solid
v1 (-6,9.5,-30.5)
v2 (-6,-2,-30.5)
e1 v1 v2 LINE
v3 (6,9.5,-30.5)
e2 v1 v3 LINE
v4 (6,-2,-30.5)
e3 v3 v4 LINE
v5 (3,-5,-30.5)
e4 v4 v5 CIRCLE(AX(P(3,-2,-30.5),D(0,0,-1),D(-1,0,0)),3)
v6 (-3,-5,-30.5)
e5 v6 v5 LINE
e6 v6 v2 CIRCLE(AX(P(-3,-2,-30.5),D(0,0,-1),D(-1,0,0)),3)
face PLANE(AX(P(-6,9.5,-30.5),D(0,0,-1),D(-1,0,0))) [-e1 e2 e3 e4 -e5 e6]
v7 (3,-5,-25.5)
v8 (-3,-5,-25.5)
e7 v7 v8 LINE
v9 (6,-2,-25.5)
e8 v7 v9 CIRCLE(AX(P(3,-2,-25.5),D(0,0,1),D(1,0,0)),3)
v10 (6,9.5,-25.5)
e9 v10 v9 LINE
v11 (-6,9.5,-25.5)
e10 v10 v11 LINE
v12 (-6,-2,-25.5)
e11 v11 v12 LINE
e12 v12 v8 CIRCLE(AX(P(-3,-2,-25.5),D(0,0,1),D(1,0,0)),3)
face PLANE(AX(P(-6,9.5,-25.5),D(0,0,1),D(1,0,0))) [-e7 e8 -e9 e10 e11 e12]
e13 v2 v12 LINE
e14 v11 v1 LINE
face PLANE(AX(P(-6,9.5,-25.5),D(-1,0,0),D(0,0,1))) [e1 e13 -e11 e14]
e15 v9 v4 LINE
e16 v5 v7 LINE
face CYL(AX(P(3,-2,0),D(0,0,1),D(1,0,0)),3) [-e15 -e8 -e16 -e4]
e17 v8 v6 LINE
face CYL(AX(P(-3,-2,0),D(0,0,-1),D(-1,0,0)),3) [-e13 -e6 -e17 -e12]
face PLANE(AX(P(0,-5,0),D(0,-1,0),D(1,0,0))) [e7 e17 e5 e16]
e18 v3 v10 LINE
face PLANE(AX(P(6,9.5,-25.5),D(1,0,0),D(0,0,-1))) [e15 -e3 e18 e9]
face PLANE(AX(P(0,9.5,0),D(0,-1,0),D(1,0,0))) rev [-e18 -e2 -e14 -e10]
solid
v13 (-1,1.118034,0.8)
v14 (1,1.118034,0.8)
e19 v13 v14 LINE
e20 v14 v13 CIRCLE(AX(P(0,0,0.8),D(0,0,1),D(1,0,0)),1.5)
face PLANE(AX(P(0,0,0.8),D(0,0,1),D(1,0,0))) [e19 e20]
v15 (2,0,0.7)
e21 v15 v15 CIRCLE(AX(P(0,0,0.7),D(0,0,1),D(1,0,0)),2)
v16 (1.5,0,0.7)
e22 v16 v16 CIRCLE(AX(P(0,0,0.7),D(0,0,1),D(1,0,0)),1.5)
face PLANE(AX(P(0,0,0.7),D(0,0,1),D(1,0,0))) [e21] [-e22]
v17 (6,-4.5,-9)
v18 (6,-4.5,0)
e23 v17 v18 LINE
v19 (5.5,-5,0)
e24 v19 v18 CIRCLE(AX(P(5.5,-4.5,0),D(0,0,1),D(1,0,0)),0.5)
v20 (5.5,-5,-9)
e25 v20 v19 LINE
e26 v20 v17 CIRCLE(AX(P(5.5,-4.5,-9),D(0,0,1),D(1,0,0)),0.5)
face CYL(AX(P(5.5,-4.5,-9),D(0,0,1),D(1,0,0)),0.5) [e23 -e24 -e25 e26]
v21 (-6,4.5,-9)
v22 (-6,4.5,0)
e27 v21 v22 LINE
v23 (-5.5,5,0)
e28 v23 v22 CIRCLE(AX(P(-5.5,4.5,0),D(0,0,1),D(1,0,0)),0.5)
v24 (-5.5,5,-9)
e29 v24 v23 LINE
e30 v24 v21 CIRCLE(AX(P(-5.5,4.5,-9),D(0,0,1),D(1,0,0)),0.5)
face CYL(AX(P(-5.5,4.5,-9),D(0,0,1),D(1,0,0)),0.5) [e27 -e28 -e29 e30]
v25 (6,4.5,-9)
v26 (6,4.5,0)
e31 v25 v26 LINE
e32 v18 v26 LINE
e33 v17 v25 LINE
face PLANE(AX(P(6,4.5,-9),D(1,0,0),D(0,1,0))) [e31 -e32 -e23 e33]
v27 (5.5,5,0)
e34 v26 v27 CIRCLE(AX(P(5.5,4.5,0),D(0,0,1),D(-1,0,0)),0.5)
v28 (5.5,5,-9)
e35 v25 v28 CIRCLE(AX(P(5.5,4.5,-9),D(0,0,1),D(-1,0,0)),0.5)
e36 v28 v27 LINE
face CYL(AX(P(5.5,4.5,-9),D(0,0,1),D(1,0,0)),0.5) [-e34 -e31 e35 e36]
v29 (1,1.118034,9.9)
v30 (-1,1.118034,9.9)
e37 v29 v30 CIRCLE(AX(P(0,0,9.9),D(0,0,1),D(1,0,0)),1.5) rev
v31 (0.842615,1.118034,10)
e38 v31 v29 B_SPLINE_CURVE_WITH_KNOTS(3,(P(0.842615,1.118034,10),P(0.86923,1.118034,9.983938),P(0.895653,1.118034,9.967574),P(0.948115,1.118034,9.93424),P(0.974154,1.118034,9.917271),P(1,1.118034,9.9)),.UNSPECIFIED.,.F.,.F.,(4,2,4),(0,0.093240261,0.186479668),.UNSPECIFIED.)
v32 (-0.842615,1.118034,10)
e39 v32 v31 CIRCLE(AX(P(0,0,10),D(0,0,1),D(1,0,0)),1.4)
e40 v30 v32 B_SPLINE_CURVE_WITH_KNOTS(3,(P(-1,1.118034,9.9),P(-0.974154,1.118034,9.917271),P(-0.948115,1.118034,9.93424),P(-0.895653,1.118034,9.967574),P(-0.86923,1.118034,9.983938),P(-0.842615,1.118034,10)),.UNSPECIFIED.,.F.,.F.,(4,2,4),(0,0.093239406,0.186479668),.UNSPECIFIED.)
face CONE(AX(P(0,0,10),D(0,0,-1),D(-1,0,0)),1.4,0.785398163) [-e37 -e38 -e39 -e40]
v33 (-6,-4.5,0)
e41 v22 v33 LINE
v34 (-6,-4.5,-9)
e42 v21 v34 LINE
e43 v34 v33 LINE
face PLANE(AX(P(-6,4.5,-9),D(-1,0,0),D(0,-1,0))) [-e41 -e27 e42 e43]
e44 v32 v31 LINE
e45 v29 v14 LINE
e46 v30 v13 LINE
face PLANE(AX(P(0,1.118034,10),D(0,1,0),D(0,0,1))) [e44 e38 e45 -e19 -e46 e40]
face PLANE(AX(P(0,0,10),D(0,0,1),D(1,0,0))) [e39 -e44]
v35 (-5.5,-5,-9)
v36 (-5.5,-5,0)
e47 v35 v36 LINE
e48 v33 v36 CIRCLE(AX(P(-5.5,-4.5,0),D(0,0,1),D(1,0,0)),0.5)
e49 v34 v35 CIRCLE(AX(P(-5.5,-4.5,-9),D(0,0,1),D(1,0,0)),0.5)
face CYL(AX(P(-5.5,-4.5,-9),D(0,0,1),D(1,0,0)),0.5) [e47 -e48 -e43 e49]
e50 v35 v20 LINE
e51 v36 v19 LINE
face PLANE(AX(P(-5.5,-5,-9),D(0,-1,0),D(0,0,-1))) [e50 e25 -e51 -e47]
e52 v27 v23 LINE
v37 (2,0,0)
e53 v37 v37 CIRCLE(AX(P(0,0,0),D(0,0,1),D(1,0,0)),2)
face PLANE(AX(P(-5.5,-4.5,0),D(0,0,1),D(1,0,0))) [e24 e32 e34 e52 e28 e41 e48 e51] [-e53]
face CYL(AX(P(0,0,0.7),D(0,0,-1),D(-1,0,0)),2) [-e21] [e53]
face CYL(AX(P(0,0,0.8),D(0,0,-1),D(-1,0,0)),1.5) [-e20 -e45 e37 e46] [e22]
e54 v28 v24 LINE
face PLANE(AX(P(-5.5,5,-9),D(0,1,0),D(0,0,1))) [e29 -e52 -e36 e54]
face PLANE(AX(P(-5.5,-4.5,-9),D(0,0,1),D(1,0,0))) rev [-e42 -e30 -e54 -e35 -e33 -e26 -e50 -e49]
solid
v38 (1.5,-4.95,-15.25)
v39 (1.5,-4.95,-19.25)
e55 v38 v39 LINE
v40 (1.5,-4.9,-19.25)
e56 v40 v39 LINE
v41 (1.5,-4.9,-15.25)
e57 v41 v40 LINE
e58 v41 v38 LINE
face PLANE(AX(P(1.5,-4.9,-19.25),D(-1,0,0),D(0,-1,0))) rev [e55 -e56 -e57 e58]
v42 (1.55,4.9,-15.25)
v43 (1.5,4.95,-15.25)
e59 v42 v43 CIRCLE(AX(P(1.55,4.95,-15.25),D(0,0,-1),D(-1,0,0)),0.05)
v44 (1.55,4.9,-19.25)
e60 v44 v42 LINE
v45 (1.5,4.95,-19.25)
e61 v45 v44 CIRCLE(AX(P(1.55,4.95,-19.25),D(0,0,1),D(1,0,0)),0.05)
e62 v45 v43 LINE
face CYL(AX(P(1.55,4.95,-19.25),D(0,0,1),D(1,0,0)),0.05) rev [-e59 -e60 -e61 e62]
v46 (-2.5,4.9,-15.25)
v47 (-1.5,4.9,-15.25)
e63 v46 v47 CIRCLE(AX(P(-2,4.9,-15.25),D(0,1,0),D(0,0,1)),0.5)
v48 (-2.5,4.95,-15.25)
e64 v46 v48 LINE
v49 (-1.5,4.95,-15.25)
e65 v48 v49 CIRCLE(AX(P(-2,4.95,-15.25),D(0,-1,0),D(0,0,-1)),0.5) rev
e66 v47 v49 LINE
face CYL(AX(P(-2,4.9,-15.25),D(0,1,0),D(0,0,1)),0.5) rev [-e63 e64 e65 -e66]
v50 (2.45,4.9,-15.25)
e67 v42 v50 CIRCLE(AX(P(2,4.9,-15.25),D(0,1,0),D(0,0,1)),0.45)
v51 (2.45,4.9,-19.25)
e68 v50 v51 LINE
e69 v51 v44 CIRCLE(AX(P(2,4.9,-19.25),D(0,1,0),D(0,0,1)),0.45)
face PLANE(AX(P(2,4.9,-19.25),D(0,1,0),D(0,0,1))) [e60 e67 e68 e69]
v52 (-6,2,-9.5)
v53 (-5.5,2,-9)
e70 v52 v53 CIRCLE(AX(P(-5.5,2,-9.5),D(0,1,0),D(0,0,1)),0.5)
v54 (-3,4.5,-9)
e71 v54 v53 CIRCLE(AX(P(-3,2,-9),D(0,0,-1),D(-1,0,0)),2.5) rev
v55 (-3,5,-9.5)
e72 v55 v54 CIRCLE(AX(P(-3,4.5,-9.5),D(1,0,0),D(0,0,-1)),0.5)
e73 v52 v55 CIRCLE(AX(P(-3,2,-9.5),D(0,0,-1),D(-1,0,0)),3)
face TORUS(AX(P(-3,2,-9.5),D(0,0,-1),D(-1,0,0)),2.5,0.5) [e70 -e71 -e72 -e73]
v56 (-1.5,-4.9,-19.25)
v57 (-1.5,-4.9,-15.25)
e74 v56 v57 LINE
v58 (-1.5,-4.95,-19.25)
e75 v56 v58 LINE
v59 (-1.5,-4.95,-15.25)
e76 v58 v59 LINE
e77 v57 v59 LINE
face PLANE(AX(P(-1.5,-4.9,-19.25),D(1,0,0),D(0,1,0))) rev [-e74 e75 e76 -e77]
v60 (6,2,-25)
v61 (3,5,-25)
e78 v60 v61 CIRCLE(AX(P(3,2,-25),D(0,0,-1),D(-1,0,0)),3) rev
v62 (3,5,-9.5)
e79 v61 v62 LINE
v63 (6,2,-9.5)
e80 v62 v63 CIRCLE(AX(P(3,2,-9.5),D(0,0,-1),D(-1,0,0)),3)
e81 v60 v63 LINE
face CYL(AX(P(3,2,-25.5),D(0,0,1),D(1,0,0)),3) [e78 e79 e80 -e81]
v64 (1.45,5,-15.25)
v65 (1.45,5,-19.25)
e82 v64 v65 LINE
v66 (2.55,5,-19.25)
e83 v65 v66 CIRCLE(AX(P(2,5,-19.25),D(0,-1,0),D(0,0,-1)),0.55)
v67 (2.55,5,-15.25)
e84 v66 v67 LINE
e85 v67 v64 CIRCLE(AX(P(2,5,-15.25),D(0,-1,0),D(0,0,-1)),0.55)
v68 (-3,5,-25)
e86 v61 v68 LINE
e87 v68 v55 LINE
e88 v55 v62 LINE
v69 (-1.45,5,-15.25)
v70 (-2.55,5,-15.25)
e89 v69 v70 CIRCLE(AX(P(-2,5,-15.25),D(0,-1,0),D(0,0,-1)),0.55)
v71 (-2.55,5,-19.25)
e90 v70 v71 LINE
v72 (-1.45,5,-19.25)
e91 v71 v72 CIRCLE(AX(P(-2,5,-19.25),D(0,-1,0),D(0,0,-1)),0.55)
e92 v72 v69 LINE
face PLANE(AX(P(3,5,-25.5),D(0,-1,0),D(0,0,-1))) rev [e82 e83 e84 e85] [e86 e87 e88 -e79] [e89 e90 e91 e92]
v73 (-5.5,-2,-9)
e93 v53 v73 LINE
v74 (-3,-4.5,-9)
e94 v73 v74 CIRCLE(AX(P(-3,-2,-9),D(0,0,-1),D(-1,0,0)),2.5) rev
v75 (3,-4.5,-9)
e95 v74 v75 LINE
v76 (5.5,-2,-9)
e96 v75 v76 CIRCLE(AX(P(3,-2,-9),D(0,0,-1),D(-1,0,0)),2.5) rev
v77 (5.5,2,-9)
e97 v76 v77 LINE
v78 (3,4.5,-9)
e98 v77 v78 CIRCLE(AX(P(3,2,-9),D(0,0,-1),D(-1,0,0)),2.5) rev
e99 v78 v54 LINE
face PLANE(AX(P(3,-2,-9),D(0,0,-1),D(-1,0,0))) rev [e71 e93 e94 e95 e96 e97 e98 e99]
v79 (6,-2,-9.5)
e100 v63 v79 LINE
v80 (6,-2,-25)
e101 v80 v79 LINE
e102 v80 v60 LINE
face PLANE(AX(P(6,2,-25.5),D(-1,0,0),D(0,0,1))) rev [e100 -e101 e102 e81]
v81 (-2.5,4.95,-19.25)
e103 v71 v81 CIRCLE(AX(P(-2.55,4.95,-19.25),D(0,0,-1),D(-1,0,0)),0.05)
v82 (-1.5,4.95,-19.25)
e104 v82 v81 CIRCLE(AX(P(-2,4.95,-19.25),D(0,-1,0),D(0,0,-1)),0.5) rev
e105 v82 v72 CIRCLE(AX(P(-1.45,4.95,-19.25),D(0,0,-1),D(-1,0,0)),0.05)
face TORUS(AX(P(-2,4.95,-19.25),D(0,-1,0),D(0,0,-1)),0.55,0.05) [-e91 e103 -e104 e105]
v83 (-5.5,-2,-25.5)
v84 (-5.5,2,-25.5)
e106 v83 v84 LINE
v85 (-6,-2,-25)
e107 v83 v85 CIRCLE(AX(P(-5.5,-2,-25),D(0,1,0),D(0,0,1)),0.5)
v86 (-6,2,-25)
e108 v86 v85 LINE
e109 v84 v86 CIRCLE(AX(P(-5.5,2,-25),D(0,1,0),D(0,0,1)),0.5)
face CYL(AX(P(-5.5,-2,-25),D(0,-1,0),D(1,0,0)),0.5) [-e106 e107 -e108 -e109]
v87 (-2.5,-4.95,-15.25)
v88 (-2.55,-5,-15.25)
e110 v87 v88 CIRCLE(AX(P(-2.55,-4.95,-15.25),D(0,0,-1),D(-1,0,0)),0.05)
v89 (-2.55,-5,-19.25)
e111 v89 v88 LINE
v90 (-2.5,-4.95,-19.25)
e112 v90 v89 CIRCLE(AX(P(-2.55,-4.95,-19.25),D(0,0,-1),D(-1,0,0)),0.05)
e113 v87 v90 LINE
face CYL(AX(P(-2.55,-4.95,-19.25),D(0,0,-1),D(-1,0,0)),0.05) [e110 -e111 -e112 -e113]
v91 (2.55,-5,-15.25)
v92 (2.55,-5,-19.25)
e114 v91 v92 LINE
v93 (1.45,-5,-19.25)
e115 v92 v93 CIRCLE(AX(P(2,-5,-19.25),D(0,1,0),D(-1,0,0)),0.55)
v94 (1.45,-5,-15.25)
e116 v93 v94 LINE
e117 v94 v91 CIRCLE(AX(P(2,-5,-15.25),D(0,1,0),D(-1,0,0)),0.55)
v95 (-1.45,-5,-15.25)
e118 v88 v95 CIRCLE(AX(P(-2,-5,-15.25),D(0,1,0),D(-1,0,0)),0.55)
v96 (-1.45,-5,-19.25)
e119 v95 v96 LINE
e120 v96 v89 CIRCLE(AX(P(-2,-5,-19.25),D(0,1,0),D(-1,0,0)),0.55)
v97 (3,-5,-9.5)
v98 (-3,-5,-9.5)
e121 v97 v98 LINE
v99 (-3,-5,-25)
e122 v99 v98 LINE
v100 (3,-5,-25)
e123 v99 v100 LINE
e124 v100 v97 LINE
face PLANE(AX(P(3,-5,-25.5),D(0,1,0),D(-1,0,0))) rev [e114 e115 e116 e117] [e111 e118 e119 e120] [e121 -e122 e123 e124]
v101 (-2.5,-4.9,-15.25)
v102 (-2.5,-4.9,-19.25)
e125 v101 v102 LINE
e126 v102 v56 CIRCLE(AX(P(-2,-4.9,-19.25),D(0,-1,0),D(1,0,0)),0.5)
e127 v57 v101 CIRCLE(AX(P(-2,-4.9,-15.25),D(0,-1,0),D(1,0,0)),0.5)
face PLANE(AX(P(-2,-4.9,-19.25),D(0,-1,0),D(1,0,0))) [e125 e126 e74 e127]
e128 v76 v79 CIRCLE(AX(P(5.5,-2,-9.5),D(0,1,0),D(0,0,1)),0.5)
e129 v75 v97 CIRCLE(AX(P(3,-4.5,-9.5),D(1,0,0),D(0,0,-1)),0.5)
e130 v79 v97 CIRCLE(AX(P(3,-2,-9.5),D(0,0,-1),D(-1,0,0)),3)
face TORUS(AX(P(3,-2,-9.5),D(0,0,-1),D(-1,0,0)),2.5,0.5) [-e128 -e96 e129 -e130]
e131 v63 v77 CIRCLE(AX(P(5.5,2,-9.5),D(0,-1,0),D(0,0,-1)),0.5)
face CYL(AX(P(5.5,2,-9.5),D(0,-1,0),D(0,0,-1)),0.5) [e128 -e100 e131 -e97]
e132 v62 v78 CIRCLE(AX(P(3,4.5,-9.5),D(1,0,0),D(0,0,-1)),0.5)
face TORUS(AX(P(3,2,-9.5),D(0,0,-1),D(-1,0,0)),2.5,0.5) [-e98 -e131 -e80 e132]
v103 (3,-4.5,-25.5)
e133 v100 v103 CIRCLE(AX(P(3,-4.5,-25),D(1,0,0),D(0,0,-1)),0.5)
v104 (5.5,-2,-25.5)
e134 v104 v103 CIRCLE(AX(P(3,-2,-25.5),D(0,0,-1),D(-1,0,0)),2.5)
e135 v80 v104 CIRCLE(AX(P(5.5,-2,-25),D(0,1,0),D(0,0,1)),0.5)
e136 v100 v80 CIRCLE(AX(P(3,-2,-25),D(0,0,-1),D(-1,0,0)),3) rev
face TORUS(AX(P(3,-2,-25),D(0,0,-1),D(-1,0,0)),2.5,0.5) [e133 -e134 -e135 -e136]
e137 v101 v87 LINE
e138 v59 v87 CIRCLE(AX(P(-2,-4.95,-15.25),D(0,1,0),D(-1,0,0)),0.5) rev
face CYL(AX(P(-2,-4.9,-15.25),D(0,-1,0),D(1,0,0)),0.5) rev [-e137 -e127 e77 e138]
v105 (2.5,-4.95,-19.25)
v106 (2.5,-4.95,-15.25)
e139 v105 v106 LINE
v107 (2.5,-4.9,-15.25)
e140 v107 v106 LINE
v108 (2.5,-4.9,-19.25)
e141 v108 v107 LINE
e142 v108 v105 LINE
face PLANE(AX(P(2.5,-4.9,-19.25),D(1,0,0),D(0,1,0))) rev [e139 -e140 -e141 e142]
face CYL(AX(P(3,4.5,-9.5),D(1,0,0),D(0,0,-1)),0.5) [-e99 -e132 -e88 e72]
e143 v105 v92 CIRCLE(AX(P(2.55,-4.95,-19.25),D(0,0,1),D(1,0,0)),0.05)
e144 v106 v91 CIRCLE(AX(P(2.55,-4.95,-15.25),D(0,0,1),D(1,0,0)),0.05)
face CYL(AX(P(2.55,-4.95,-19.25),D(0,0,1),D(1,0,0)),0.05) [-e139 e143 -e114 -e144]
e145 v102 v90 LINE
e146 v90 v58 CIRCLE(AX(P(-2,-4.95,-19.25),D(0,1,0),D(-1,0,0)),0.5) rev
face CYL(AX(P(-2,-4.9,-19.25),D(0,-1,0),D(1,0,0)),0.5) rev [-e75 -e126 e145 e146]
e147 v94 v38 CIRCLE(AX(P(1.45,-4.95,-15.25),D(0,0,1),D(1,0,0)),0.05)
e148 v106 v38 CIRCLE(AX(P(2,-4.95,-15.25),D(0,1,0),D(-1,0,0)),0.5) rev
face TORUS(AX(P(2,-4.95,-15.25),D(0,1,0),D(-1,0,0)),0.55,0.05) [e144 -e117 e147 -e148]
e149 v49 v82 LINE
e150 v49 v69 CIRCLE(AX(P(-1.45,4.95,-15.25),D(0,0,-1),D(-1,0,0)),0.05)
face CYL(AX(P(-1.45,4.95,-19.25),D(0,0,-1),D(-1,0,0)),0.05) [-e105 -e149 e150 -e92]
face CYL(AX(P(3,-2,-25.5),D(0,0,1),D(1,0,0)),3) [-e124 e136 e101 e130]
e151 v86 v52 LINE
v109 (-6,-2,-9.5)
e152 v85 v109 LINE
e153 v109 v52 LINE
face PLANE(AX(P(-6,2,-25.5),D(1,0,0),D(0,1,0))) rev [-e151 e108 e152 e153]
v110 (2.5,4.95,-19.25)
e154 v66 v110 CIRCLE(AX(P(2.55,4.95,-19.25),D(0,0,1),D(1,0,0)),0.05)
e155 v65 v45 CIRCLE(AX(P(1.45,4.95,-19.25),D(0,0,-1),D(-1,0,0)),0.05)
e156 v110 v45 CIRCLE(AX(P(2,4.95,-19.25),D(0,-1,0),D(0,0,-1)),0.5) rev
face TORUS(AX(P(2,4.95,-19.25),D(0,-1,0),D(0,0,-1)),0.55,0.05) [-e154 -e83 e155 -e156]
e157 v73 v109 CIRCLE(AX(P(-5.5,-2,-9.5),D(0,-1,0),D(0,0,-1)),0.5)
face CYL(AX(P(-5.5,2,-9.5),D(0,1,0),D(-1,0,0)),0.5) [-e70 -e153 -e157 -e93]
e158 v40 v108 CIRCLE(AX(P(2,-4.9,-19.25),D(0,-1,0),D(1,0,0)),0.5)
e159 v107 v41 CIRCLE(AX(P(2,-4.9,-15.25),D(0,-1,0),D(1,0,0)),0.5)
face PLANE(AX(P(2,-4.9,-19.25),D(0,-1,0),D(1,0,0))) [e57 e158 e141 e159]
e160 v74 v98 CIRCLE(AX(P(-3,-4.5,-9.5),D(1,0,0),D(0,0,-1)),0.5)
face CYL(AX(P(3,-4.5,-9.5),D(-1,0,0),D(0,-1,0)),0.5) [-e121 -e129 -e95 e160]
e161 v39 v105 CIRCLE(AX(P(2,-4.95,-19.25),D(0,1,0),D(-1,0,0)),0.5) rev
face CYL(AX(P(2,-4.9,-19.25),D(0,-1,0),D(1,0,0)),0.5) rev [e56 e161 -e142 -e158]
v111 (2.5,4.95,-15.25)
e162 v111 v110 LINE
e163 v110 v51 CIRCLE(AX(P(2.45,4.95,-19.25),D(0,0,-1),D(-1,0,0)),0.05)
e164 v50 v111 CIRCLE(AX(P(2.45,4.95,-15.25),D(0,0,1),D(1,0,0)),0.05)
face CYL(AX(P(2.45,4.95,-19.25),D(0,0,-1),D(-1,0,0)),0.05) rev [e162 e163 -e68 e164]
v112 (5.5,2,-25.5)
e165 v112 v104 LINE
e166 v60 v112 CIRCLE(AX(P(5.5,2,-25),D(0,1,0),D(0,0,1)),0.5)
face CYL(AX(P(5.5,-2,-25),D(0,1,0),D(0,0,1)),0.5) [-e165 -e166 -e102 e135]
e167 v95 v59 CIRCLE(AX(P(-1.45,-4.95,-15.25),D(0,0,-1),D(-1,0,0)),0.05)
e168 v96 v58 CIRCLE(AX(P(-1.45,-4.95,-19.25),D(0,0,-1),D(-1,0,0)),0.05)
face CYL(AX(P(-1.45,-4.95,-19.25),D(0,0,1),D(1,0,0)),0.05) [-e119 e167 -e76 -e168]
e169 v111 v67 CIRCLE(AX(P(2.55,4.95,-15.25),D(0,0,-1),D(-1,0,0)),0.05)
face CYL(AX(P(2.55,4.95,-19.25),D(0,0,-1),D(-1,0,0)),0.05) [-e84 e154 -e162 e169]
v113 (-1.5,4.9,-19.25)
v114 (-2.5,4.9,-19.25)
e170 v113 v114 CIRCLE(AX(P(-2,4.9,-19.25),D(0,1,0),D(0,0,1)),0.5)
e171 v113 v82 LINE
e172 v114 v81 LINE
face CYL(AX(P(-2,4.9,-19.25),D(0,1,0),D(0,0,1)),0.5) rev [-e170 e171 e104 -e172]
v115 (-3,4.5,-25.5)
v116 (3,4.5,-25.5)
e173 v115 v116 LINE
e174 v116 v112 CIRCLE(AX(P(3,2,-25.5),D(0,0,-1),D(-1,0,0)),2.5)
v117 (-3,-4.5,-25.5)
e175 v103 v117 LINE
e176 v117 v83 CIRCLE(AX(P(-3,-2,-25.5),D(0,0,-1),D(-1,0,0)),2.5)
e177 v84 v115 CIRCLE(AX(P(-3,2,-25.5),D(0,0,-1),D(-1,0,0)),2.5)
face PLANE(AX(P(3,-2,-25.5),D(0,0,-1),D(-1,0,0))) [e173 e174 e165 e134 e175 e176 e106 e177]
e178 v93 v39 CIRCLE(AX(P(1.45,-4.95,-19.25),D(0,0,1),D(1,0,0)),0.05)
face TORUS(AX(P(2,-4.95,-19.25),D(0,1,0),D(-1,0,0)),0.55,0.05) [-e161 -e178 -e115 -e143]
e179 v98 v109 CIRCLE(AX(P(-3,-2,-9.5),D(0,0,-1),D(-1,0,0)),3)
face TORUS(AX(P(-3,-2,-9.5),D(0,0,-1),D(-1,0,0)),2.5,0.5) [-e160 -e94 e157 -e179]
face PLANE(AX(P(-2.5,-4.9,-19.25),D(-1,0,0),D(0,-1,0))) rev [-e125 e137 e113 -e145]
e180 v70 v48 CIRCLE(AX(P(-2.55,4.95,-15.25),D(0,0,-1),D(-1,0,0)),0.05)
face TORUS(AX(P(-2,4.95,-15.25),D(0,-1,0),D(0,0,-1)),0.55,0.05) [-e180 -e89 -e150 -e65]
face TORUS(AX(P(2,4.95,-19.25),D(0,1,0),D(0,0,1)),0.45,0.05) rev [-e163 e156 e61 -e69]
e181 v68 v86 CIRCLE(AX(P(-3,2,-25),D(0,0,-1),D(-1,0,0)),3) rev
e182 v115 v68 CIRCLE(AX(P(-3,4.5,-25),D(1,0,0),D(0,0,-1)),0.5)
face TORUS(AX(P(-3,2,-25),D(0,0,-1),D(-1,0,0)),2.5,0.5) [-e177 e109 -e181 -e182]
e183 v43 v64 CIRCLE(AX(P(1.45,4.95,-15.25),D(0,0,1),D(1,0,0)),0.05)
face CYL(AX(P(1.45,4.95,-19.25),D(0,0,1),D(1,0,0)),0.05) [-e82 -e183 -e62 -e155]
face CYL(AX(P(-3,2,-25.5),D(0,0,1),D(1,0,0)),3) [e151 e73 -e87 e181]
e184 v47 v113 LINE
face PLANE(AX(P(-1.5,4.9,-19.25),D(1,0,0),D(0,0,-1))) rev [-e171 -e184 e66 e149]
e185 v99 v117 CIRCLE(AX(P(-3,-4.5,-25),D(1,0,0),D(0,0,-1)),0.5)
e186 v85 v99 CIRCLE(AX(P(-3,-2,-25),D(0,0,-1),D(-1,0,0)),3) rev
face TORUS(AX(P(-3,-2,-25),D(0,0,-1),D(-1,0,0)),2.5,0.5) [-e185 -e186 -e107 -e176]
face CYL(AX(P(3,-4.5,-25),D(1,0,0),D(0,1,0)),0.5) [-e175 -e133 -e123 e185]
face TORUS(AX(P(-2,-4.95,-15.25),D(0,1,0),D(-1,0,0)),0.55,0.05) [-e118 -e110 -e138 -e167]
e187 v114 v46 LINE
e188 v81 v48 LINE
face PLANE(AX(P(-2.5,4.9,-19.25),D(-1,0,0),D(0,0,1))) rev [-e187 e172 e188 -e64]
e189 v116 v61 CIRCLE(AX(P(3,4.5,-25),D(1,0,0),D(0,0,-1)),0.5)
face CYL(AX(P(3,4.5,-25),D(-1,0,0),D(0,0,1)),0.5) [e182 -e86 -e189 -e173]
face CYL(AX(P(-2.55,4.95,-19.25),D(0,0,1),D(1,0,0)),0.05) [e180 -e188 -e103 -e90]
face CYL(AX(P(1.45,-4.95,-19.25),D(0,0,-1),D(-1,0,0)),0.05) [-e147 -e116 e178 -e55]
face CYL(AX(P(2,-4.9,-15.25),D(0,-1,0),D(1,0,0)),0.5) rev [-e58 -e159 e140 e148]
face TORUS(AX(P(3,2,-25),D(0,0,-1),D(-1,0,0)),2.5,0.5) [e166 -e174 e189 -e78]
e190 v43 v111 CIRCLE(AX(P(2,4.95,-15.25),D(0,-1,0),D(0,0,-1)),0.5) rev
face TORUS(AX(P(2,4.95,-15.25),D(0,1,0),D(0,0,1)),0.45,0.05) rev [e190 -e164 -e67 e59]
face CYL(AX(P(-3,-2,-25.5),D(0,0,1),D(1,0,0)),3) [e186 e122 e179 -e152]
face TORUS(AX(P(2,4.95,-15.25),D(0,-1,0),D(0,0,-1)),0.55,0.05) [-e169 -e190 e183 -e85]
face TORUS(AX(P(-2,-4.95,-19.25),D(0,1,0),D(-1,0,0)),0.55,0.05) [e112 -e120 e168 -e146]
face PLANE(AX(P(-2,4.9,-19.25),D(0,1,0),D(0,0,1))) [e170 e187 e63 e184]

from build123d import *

# Parameters (mm, degrees)
BOSS_EXTRU_1_DEPTH      = 9
ESQUISSE2_R             = 2
BOSS_EXTRU_2_DEPTH      = 0.7
ESQUISSE3_R             = 1.5
BOSS_EXTRU_3_DEPTH      = 0.1
BOSS_EXTRU_4_DEPTH      = 9.2
CHANFREIN1_SIZE         = 0.1
BOSS_EXTRU_5_DEPTH      = 16.5
ESQUISSE6_W             = 12
ESQUISSE6_H             = 5
BOSS_EXTRU_6_DEPTH      = 14.5
CONG_1_R                = 3
ENL_V_MAT_EXTRU_1_DEPTH = 0.1
ENL_V_MAT_EXTRU_2_DEPTH = 0.1
CONG_2_R                = 0.05
CONG_3_R                = 0.5


with BuildPart() as part:
    # Esquisse1 → Boss.-Extru.1 (new body)
    with BuildSketch(Plane.XY):
        with BuildLine():
            Line((-5.5, 5), (5.5, 5))
            ThreePointArc((5.5, 5), (5.853553391, 4.853553391), (6, 4.5))
            Line((6, 4.5), (6, -4.5))
            ThreePointArc((6, -4.5), (5.853553391, -4.853553391), (5.5, -5))
            Line((5.5, -5), (-5.5, -5))
            ThreePointArc((-5.5, -5), (-5.853553391, -4.853553391), (-6, -4.5))
            Line((-6, -4.5), (-6, 4.5))
            ThreePointArc((-6, 4.5), (-5.853553391, 4.853553391), (-5.5, 5))
        make_face()
    extrude(amount=-BOSS_EXTRU_1_DEPTH)

    # Esquisse2 → Boss.-Extru.2 (add)
    with BuildSketch(Plane.XY):
        Circle(ESQUISSE2_R)
    extrude(amount=BOSS_EXTRU_2_DEPTH)

    # Esquisse3 → Boss.-Extru.3 (add)
    with BuildSketch(Plane.XY.offset(0.7)):
        Circle(ESQUISSE3_R)
    extrude(amount=BOSS_EXTRU_3_DEPTH)

    # Esquisse4 → Boss.-Extru.4 (add)
    with BuildSketch(Plane.XY.offset(0.8)):
        with BuildLine():
            Line((1, 1.118033989), (-1, 1.118033989))
            ThreePointArc((-1, 1.118033989), (0, -1.5), (1, 1.118033989))
        make_face()
    extrude(amount=BOSS_EXTRU_4_DEPTH)

    # Chanfrein1
    chanfrein1_edges = [part.edges().sort_by_distance(p)[0] for p in [
        (0, -1.5, 10),
    ]]
    chamfer(chanfrein1_edges, length=CHANFREIN1_SIZE)


with BuildPart() as body_2:
    # Esquisse5 → Boss.-Extru.5 (new body)
    with BuildSketch(Plane(origin=(0, 0, -9), x_dir=(-1, 0, 0), z_dir=(0, 0, -1))):
        with BuildLine():
            Line((-3, 5), (3, 5))
            ThreePointArc((3, 5), (5.121320344, 4.121320344), (6, 2))
            Line((6, 2), (6, -2))
            ThreePointArc((6, -2), (5.121320344, -4.121320344), (3, -5))
            Line((3, -5), (-3, -5))
            ThreePointArc((-3, -5), (-5.121320344, -4.121320344), (-6, -2))
            Line((-6, -2), (-6, 2))
            ThreePointArc((-6, 2), (-5.121320344, 4.121320344), (-3, 5))
        make_face()
    extrude(amount=BOSS_EXTRU_5_DEPTH)

    # Esquisse7 → Enlèv. mat.-Extru.1 (cut)
    with BuildSketch(Plane(origin=(0, 5, 0), x_dir=(1, 0, 0), z_dir=(0, 1, 0))):
        with BuildLine():
            Line((-1.5, 19.25), (-1.5, 15.25))
            ThreePointArc((-1.5, 15.25), (-2, 14.75), (-2.5, 15.25))
            Line((-2.5, 15.25), (-2.5, 19.25))
            ThreePointArc((-2.5, 19.25), (-2, 19.75), (-1.5, 19.25))
        make_face()
        with BuildLine():
            Line((2.5, 19.25), (2.5, 15.25))
            ThreePointArc((2.5, 15.25), (2, 14.75), (1.5, 15.25))
            Line((1.5, 15.25), (1.5, 19.25))
            ThreePointArc((1.5, 19.25), (2, 19.75), (2.5, 19.25))
        make_face()
    extrude(amount=-ENL_V_MAT_EXTRU_1_DEPTH, mode=Mode.SUBTRACT)

    # Esquisse8 → Enlèv. mat.-Extru.2 (cut)
    with BuildSketch(Plane(origin=(0, -5, 0), x_dir=(-1, 0, 0), z_dir=(0, -1, 0))):
        with BuildLine():
            Line((-1.5, 19.25), (-1.5, 15.25))
            ThreePointArc((-1.5, 15.25), (-2, 14.75), (-2.5, 15.25))
            Line((-2.5, 15.25), (-2.5, 19.25))
            ThreePointArc((-2.5, 19.25), (-2, 19.75), (-1.5, 19.25))
        make_face()
        with BuildLine():
            Line((2.5, 19.25), (2.5, 15.25))
            ThreePointArc((2.5, 15.25), (2, 14.75), (1.5, 15.25))
            Line((1.5, 15.25), (1.5, 19.25))
            ThreePointArc((1.5, 19.25), (2, 19.75), (2.5, 19.25))
        make_face()
    extrude(amount=-ENL_V_MAT_EXTRU_2_DEPTH, mode=Mode.SUBTRACT)

    # Congé2
    cong_2_edges = [body_2.edges().sort_by_distance(p)[0] for p in [
        (-2, 5, -19.75),
        (-2.5, 5, -17.25),
        (-2, 5, -14.75),
        (-1.5, 5, -17.25),
        (2, 4.9, -19.75),
        (2.5, 4.9, -17.25),
        (2, 4.9, -14.75),
        (1.5, 4.9, -17.25),
        (2, 5, -19.75),
        (1.5, 5, -17.25),
        (2, 5, -14.75),
        (2.5, 5, -17.25),
        (2, -5, -19.75),
        (2.5, -5, -17.25),
        (2, -5, -14.75),
        (1.5, -5, -17.25),
        (-2, -5, -19.75),
        (-1.5, -5, -17.25),
        (-2, -5, -14.75),
        (-2.5, -5, -17.25),
    ]]
    fillet(cong_2_edges, radius=CONG_2_R - 0.0001)  # a hair under: the kernel refuses the full size

    # Congé3
    cong_3_edges = [body_2.edges().sort_by_distance(p)[0] for p in [
        (-6, 0, -9),
        (-5.121320344, -4.121320344, -9),
        (0, -5, -9),
        (5.121320344, -4.121320344, -9),
        (-5.121320344, -4.121320344, -25.5),
        (-6, 0, -25.5),
        (-5.121320344, 4.121320344, -25.5),
        (0, 5, -25.5),
        (5.121320344, 4.121320344, -25.5),
        (6, 0, -25.5),
        (5.121320344, -4.121320344, -25.5),
        (6, 0, -9),
        (0, -5, -25.5),
        (5.121320344, 4.121320344, -9),
        (0, 5, -9),
        (-5.121320344, 4.121320344, -9),
    ]]
    fillet(cong_3_edges, radius=CONG_3_R)


with BuildPart() as body_3:
    # Esquisse6 → Boss.-Extru.6 (new body)
    with BuildSketch(Plane.XZ.offset(5)):
        with Locations((0, -28)):
            Rectangle(ESQUISSE6_W, ESQUISSE6_H)
    extrude(amount=-BOSS_EXTRU_6_DEPTH)

    # Congé1
    cong_1_edges = [body_3.edges().sort_by_distance(p)[0] for p in [
        (6, -5, -28),
        (-6, -5, -28),
    ]]
    fillet(cong_1_edges, radius=CONG_1_R)


solid = Compound([part.part, body_2.part, body_3.part])
